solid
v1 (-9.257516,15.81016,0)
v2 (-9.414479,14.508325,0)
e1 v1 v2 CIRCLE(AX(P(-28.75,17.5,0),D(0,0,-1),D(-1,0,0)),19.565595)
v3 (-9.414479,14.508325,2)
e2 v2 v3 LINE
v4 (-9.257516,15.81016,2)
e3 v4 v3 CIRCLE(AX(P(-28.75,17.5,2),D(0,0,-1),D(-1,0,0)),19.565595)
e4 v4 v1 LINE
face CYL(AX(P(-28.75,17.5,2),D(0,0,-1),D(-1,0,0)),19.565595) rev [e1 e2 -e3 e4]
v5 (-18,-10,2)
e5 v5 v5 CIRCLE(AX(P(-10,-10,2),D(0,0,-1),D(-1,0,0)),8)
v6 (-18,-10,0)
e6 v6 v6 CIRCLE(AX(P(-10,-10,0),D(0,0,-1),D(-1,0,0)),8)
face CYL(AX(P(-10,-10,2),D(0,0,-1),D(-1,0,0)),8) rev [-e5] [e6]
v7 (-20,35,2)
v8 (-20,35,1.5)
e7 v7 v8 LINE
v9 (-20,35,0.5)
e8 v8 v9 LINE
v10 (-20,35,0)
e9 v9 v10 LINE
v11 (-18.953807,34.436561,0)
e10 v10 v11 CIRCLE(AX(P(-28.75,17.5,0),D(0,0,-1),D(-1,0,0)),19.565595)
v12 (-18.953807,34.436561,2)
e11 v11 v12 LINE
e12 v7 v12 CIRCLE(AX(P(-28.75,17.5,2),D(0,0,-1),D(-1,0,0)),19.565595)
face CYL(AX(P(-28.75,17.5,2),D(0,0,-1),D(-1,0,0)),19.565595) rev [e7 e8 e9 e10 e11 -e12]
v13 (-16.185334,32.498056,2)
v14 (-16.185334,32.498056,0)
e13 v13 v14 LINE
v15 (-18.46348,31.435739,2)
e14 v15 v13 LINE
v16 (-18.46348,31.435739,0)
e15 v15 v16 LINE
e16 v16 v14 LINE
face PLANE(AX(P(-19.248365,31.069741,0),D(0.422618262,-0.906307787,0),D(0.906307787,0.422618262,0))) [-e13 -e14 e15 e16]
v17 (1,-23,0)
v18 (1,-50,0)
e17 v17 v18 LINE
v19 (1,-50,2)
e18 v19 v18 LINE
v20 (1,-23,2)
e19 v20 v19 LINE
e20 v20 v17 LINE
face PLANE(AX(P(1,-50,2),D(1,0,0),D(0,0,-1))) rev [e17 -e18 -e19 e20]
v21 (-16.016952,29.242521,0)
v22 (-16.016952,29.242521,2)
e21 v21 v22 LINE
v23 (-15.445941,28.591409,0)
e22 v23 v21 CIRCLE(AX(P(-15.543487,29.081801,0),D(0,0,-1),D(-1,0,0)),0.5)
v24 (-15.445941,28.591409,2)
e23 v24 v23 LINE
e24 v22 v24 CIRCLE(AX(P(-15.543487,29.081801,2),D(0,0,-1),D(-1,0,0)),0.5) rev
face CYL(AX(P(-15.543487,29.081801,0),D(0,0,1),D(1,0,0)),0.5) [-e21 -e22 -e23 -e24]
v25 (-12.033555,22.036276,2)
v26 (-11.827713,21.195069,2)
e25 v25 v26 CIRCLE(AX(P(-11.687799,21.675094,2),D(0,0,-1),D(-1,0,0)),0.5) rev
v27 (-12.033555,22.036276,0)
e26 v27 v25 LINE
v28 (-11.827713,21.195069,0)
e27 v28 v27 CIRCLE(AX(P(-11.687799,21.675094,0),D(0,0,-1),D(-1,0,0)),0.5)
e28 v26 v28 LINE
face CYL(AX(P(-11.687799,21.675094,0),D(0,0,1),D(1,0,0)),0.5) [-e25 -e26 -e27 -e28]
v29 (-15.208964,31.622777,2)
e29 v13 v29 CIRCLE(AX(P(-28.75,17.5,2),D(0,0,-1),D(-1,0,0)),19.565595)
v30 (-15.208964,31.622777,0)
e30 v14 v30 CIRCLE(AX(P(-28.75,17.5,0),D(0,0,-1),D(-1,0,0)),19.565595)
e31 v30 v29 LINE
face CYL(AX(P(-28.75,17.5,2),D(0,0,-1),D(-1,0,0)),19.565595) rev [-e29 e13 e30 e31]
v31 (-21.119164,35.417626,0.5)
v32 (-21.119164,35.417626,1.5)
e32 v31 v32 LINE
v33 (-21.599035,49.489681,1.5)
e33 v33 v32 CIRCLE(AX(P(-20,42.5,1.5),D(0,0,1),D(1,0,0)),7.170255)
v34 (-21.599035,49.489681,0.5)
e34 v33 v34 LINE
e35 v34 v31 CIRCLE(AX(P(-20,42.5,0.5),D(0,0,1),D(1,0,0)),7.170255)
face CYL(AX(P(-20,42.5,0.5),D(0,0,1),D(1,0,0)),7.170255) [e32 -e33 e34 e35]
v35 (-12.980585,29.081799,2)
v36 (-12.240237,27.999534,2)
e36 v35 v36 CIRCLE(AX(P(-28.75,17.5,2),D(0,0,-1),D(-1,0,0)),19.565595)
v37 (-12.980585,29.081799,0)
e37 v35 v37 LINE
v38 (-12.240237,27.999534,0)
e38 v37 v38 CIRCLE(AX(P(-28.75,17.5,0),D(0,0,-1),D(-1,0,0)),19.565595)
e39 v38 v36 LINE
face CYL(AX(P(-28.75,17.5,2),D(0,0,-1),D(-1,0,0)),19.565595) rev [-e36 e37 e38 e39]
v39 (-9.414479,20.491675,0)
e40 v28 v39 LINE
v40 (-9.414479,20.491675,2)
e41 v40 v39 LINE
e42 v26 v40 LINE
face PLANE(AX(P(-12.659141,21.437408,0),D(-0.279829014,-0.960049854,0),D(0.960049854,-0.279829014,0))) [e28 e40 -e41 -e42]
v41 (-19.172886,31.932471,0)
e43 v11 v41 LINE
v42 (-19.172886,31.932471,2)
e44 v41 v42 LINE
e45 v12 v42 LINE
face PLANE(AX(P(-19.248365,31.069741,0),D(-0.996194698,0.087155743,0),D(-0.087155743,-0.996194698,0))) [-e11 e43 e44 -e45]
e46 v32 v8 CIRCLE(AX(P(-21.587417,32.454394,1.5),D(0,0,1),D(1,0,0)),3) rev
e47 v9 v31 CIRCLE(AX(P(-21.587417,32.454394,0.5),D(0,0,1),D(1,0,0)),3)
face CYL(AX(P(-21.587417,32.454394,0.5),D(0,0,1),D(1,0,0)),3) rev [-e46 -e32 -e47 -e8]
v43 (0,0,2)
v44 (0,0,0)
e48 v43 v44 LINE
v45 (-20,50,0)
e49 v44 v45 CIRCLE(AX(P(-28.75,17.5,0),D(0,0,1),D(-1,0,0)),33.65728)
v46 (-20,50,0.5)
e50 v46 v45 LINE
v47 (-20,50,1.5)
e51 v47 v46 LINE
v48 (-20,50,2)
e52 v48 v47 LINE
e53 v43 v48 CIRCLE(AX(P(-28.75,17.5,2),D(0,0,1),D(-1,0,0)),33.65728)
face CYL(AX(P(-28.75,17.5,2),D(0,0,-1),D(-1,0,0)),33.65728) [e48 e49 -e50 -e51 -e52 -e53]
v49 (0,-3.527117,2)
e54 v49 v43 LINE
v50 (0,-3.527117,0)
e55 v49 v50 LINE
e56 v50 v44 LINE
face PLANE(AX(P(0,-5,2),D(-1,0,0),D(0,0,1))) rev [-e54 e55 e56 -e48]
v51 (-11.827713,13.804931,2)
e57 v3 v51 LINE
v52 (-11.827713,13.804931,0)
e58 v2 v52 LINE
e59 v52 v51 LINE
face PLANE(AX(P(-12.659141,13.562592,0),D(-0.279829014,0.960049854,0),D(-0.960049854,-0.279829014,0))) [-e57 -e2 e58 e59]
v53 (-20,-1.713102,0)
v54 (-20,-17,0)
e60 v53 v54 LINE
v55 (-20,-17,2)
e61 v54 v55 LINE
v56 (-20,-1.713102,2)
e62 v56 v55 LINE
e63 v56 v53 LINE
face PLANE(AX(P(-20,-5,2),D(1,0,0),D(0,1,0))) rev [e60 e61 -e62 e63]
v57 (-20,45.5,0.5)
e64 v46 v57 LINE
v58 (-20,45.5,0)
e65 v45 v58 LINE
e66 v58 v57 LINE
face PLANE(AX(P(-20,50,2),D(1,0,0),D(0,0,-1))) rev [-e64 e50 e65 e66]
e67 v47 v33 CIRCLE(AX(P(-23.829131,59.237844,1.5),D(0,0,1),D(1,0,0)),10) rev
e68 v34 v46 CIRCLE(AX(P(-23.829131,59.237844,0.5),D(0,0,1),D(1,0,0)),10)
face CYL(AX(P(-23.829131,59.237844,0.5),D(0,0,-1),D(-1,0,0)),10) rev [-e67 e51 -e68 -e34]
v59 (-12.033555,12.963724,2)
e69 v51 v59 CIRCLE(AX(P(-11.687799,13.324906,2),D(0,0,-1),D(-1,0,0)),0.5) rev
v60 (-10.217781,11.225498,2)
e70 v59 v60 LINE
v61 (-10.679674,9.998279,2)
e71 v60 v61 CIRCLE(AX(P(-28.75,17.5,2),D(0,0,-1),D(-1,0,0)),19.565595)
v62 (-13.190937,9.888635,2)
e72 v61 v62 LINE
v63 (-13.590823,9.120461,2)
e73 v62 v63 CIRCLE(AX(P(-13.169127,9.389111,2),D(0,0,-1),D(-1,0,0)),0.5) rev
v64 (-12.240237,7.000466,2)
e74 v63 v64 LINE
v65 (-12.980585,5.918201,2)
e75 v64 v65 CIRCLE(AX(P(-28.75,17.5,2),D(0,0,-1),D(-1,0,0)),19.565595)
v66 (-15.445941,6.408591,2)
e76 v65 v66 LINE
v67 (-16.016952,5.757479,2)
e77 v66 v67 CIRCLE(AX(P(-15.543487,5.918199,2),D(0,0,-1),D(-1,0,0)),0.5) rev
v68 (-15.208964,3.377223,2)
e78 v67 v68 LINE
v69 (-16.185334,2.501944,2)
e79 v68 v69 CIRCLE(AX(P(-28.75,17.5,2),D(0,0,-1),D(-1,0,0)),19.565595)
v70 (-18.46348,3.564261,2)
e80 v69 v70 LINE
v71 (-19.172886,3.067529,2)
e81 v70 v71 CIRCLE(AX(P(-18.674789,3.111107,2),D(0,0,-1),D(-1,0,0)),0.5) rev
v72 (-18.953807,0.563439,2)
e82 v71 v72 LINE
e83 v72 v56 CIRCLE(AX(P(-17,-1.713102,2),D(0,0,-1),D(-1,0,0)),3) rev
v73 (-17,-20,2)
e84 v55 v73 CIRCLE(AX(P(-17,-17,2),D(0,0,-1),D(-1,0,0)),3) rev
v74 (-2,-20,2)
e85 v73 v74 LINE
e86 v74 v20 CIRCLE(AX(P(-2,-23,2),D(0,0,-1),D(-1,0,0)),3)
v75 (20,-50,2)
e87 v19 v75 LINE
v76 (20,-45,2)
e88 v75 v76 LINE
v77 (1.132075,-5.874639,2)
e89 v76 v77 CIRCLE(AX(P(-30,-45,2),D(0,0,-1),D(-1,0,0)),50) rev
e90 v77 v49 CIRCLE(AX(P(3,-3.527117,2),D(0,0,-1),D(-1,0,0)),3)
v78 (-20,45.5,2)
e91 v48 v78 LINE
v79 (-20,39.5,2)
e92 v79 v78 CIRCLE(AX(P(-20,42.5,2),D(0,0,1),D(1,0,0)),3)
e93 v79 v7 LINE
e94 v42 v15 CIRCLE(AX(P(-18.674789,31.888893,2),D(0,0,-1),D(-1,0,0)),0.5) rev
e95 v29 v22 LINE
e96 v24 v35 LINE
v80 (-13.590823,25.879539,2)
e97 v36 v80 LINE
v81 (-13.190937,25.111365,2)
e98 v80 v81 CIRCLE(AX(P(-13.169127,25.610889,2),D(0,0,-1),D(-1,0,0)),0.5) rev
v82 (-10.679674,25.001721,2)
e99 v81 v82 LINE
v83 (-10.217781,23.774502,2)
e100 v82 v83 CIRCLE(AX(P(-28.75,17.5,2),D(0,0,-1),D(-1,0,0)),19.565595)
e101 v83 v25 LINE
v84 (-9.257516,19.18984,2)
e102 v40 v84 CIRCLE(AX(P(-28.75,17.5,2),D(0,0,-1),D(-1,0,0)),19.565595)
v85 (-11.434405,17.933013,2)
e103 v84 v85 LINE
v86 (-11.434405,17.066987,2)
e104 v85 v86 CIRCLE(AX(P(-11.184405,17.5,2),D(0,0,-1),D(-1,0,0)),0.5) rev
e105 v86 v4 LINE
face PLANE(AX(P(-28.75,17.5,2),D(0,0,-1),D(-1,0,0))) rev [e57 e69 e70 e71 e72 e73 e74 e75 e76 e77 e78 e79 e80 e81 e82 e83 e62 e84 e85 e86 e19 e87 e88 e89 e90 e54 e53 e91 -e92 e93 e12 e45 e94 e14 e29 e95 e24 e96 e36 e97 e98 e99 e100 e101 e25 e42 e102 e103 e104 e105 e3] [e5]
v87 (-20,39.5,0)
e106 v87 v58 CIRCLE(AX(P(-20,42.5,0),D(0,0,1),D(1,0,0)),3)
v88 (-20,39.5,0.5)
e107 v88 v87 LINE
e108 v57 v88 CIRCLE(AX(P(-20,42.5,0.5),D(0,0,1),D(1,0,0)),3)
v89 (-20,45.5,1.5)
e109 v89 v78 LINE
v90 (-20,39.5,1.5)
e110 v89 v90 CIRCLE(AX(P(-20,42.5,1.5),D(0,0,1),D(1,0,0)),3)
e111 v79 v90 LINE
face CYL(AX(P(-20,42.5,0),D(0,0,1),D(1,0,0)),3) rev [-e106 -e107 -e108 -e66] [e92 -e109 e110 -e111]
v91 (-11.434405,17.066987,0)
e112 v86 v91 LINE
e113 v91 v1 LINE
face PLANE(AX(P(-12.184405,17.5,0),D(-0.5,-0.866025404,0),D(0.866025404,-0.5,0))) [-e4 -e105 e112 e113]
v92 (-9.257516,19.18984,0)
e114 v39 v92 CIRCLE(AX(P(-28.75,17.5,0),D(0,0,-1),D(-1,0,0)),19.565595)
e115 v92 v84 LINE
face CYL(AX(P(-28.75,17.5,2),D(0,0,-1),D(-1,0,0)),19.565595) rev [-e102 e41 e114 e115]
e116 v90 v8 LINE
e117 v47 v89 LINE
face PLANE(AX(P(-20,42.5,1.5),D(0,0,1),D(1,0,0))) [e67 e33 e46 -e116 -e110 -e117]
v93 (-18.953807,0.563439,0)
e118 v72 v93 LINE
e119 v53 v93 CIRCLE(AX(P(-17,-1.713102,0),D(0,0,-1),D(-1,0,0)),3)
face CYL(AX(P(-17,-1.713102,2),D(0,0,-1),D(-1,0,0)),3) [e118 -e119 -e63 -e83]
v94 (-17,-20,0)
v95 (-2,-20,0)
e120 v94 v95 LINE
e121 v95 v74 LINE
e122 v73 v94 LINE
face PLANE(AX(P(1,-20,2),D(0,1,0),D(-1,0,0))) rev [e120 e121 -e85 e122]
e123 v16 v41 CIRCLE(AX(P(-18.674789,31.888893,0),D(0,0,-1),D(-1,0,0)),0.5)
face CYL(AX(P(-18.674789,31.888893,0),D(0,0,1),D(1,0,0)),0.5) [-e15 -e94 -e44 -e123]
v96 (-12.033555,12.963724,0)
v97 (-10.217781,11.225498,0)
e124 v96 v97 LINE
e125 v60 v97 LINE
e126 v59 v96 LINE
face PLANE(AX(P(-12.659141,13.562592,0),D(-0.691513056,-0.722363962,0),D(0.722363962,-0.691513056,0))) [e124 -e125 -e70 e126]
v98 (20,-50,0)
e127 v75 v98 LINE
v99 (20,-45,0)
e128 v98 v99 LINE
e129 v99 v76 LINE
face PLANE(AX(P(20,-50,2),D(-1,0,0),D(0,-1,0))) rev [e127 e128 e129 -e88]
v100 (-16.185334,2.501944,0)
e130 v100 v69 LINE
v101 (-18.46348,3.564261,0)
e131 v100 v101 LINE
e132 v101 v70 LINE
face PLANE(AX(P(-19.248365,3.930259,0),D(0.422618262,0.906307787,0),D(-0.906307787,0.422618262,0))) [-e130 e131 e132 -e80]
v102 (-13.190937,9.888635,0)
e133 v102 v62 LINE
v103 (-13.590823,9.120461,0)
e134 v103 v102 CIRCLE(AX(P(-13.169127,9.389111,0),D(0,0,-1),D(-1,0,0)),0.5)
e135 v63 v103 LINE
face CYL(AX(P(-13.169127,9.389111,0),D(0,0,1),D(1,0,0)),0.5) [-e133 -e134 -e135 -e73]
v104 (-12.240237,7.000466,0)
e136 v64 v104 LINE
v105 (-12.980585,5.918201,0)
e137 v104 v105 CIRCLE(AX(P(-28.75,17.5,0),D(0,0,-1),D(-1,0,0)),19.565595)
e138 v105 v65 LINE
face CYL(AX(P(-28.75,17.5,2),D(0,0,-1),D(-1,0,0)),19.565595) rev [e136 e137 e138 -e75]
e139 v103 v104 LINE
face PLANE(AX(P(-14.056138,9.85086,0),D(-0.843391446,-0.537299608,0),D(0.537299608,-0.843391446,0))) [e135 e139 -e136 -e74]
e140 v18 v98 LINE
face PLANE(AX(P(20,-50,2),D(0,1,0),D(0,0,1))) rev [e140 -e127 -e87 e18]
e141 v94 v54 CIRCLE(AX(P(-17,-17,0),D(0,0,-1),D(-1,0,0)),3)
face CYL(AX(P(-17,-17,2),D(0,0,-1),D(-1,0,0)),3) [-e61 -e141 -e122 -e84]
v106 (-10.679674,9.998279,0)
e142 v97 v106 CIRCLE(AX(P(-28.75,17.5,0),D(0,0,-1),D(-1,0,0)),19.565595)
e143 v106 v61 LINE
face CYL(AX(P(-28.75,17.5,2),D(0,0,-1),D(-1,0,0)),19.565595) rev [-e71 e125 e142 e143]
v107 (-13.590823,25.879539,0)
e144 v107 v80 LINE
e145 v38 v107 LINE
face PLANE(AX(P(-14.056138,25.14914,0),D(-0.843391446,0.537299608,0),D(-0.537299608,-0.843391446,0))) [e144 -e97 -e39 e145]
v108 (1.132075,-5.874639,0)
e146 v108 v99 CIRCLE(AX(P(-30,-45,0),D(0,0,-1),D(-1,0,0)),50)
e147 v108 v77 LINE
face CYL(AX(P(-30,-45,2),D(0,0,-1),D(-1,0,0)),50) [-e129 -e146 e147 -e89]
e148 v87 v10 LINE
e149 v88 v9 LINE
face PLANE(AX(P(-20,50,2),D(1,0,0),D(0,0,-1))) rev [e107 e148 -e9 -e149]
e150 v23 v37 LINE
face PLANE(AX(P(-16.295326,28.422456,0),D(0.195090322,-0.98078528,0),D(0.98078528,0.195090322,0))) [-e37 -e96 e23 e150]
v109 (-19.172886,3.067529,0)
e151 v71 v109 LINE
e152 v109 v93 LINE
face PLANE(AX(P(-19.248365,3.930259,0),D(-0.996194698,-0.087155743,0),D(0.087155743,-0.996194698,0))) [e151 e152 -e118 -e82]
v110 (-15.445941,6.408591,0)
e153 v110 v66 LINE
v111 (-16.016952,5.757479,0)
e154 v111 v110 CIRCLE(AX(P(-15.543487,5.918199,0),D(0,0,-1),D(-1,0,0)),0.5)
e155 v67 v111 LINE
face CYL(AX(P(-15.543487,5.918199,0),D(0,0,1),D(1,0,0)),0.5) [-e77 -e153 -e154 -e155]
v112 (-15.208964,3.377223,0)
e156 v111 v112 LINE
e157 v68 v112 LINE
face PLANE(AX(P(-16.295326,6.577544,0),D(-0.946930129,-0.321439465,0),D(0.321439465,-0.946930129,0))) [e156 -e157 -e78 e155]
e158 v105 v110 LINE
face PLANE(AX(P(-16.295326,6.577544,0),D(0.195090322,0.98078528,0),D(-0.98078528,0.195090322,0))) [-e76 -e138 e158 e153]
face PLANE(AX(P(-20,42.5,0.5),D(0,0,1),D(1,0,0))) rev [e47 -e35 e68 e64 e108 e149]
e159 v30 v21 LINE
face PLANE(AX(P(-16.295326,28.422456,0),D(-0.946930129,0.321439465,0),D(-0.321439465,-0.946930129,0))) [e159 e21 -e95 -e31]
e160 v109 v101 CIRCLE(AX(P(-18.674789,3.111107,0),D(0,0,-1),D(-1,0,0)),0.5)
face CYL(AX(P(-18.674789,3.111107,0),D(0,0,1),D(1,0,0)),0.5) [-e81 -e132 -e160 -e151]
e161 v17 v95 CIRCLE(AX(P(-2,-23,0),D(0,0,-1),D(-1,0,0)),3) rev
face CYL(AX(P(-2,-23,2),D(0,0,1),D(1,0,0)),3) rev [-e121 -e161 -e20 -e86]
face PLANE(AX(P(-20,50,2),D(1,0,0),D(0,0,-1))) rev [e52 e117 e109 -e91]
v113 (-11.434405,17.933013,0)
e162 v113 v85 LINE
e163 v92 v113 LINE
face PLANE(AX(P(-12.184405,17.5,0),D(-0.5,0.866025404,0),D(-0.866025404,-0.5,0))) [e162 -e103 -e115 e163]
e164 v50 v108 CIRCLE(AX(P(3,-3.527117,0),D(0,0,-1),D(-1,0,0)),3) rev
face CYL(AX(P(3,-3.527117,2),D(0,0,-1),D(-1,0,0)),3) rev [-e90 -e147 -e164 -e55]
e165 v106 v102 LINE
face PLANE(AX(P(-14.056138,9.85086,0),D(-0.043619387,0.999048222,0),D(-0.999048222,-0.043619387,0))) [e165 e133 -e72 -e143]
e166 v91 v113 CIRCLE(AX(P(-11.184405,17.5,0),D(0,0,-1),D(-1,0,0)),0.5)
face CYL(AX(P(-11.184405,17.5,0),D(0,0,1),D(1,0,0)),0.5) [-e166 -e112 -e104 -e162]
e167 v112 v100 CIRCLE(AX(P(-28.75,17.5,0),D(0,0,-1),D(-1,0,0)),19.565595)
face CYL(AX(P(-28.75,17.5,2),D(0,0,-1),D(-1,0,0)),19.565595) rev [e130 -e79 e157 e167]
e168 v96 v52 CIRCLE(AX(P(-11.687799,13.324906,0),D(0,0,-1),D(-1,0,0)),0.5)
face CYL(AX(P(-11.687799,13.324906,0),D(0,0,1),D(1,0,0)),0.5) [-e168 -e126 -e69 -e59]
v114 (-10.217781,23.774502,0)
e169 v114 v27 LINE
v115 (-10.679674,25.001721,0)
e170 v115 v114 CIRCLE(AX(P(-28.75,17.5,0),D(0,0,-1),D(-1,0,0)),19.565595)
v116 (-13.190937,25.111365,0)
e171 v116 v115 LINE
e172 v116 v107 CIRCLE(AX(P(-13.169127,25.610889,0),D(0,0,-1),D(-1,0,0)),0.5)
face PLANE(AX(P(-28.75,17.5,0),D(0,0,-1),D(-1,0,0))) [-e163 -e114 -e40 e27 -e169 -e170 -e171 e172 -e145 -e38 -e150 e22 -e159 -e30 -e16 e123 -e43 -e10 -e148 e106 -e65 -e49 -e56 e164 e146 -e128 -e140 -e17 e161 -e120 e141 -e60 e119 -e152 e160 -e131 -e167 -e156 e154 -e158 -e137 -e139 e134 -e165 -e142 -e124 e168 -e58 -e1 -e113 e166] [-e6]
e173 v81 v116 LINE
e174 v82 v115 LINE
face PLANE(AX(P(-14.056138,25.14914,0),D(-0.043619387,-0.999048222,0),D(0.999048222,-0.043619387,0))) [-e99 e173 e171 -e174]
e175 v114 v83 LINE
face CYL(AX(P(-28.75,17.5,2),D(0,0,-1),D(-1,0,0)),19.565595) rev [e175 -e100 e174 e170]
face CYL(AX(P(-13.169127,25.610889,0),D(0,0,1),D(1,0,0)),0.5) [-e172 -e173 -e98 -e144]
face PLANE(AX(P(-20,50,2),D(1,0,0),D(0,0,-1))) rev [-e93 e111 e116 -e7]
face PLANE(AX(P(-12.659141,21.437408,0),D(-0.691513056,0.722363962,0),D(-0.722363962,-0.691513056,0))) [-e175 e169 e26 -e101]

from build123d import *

# Parameters (mm, degrees)
BOSS_EXTRUDE1_DEPTH       = 2
BOSS_EXTRUDE2_DEPTH       = 2
CIRPATTERN1_COUNT         = 5
CIRPATTERN1_ANGLE         = 55
CIRPATTERN2_COPY_1_DEPTH  = 2
CIRPATTERN2_COPY_2_DEPTH  = 2
CIRPATTERN2_COPY_3_DEPTH  = 2
CIRPATTERN2_COPY_4_DEPTH  = 2
CIRPATTERN2_COPY_5_DEPTH  = 2
CIRPATTERN2_COPY_6_DEPTH  = 2
CIRPATTERN2_COPY_7_DEPTH  = 2
CIRPATTERN2_COPY_8_DEPTH  = 2
CIRPATTERN2_COPY_9_DEPTH  = 2
CIRPATTERN2_COPY_10_DEPTH = 2
CIRPATTERN2_COPY_11_DEPTH = 2
CIRPATTERN2_COPY_12_DEPTH = 2
CIRPATTERN2_COPY_13_DEPTH = 2
CIRPATTERN2_COPY_14_DEPTH = 2
CIRPATTERN2_COPY_15_DEPTH = 2
CIRPATTERN2_COPY_16_DEPTH = 2
CIRPATTERN2_COPY_17_DEPTH = 2
CIRPATTERN2_COPY_18_DEPTH = 2
CIRPATTERN2_COPY_19_DEPTH = 2
CIRPATTERN2_COPY_20_DEPTH = 2
SKETCH3_R                 = 8
CUT_EXTRUDE1_DEPTH        = 54.888774341
BOSS_EXTRUDE3_DEPTH       = 0.5
BOSS_EXTRUDE3_DEPTH_BACK  = 0.5
SKETCH4_R                 = 7.170254919
CUT_EXTRUDE2_DEPTH        = 57.914170049
CUT_EXTRUDE2_DEPTH_BACK   = 57.914170049
SKETCH5_R                 = 3
FILLET1_R                 = 50
FILLET2_R                 = 10
FILLET3_R                 = 3
FILLET4_R                 = 0.5


with BuildPart() as part:
    # Sketch1 → Boss-Extrude1 (new body)
    with BuildSketch(Plane.XY):
        with BuildLine():
            Line((-20, -5), (-20, -20))
            Line((-20, -20), (0, -20))
            Line((0, -20), (1, -20))
            Line((1, -20), (1, -50))
            Line((1, -50), (20, -50))
            Line((20, -50), (20, -5))
            Line((20, -5), (0, -5))
            Line((0, -5), (0, 0))
            ThreePointArc((0, 0), (2.5, 30), (-20, 50))
            Line((-20, 50), (-20, 35))
            ThreePointArc((-20, 35), (-9.184405197, 17.5), (-20, 0))
            Line((-20, 0), (-20, -5))
        make_face()
    extrude(amount=BOSS_EXTRUDE1_DEPTH)

    # Sketch2 → Boss-Extrude2 (add)
    with BuildSketch(Plane.XY.offset(2)):
        Polygon((-12.184405197, 17.5), (-8.511312338, 19.620661151), (-8.511312338, 15.379338849), align=None)
    boss_extrude2 = extrude(amount=-BOSS_EXTRUDE2_DEPTH)

    # CirPattern1: Boss-Extrude2 ×5 about axis
    cirpattern1_axis = Axis((-28.75, 17.5, 0), (0, 0, -1))
    for i in range(1, CIRPATTERN1_COUNT):
        add(boss_extrude2.rotate(cirpattern1_axis, i * CIRPATTERN1_ANGLE / (CIRPATTERN1_COUNT - 1)))

    # CirPattern2 copy 1 sketch → CirPattern2 copy 1 (add)
    with BuildSketch(Plane.XY.offset(2)):
        Polygon((-12.184405197, 17.5), (-8.511312338, 19.620661151), (-8.511312338, 15.379338849), align=None)
    extrude(amount=-CIRPATTERN2_COPY_1_DEPTH)

    # CirPattern2 copy 2 sketch → CirPattern2 copy 2 (add)
    with BuildSketch(Plane(origin=(3.335587623, 7.334983183, 2), x_dir=(0.9713420698132613, 0.23768589232617357, 0), z_dir=(0, 0, 1))):
        Polygon((-12.184405197, 17.5), (-8.511312338, 19.620661151), (-8.511312338, 15.379338849), align=None)
    extrude(amount=-CIRPATTERN2_COPY_2_DEPTH)

    # CirPattern2 copy 3 sketch → CirPattern2 copy 3 (add)
    with BuildSketch(Plane(origin=(4.832162185, 15.25258305, 2), x_dir=(0.8870108331782213, 0.46174861323503485, 0), z_dir=(0, 0, 1))):
        Polygon((-12.184405197, 17.5), (-8.511312338, 19.620661151), (-8.511312338, 15.379338849), align=None)
    extrude(amount=-CIRPATTERN2_COPY_3_DEPTH)

    # CirPattern2 copy 4 sketch → CirPattern2 copy 4 (add)
    with BuildSketch(Plane(origin=(4.403946229, 23.298995553, 2), x_dir=(0.7518398074789764, 0.6593458151000701, 0), z_dir=(0, 0, 1))):
        Polygon((-12.184405197, 17.5), (-8.511312338, 19.620661151), (-8.511312338, 15.379338849), align=None)
    extrude(amount=-CIRPATTERN2_COPY_4_DEPTH)

    # CirPattern2 copy 5 sketch → CirPattern2 copy 5 (add)
    with BuildSketch(Plane(origin=(-4.983418609, -6.331955626, 2), x_dir=(0.9713420698132613, -0.23768589232617357, 0), z_dir=(0, 0, 1))):
        Polygon((-12.184405197, 17.5), (-8.511312338, 19.620661151), (-8.511312338, 15.379338849), align=None)
    extrude(amount=-CIRPATTERN2_COPY_5_DEPTH)

    # CirPattern2 copy 6 sketch → CirPattern2 copy 6 (add)
    with BuildSketch(Plane.XY.offset(2)):
        Polygon((-12.184405197, 17.5), (-8.511312338, 19.620661151), (-8.511312338, 15.379338849), align=None)
    extrude(amount=-CIRPATTERN2_COPY_6_DEPTH)

    # CirPattern2 copy 7 sketch → CirPattern2 copy 7 (add)
    with BuildSketch(Plane(origin=(3.335587623, 7.334983183, 2), x_dir=(0.9713420698132613, 0.2376858923261736, 0), z_dir=(0, 0, 1))):
        Polygon((-12.184405197, 17.5), (-8.511312338, 19.620661151), (-8.511312338, 15.379338849), align=None)
    extrude(amount=-CIRPATTERN2_COPY_7_DEPTH)

    # CirPattern2 copy 8 sketch → CirPattern2 copy 8 (add)
    with BuildSketch(Plane(origin=(4.832162185, 15.25258305, 2), x_dir=(0.8870108331782214, 0.4617486132350349, 0), z_dir=(0, 0, 1))):
        Polygon((-12.184405197, 17.5), (-8.511312338, 19.620661151), (-8.511312338, 15.379338849), align=None)
    extrude(amount=-CIRPATTERN2_COPY_8_DEPTH)

    # CirPattern2 copy 9 sketch → CirPattern2 copy 9 (add)
    with BuildSketch(Plane(origin=(-11.329039278, -11.297962211, 2), x_dir=(0.8870108331782213, -0.46174861323503485, 0), z_dir=(0, 0, 1))):
        Polygon((-12.184405197, 17.5), (-8.511312338, 19.620661151), (-8.511312338, 15.379338849), align=None)
    extrude(amount=-CIRPATTERN2_COPY_9_DEPTH)

    # CirPattern2 copy 10 sketch → CirPattern2 copy 10 (add)
    with BuildSketch(Plane(origin=(-4.983418609, -6.331955626, 2), x_dir=(0.9713420698132613, -0.2376858923261736, 0), z_dir=(0, 0, 1))):
        Polygon((-12.184405197, 17.5), (-8.511312338, 19.620661151), (-8.511312338, 15.379338849), align=None)
    extrude(amount=-CIRPATTERN2_COPY_10_DEPTH)

    # CirPattern2 copy 11 sketch → CirPattern2 copy 11 (add)
    with BuildSketch(Plane.XY.offset(2)):
        Polygon((-12.184405197, 17.5), (-8.511312338, 19.620661151), (-8.511312338, 15.379338849), align=None)
    extrude(amount=-CIRPATTERN2_COPY_11_DEPTH)

    # CirPattern2 copy 12 sketch → CirPattern2 copy 12 (add)
    with BuildSketch(Plane(origin=(3.335587623, 7.334983183, 2), x_dir=(0.9713420698132613, 0.2376858923261736, 0), z_dir=(0, 0, 1))):
        Polygon((-12.184405197, 17.5), (-8.511312338, 19.620661151), (-8.511312338, 15.379338849), align=None)
    extrude(amount=-CIRPATTERN2_COPY_12_DEPTH)

    # CirPattern2 copy 13 sketch → CirPattern2 copy 13 (add)
    with BuildSketch(Plane(origin=(-18.673157299, -14.613388815, 2), x_dir=(0.7518398074789764, -0.6593458151000701, 0), z_dir=(0, 0, 1))):
        Polygon((-12.184405197, 17.5), (-8.511312338, 19.620661151), (-8.511312338, 15.379338849), align=None)
    extrude(amount=-CIRPATTERN2_COPY_13_DEPTH)

    # CirPattern2 copy 14 sketch → CirPattern2 copy 14 (add)
    with BuildSketch(Plane(origin=(-11.329039278, -11.297962211, 2), x_dir=(0.8870108331782214, -0.4617486132350349, 0), z_dir=(0, 0, 1))):
        Polygon((-12.184405197, 17.5), (-8.511312338, 19.620661151), (-8.511312338, 15.379338849), align=None)
    extrude(amount=-CIRPATTERN2_COPY_14_DEPTH)

    # CirPattern2 copy 15 sketch → CirPattern2 copy 15 (add)
    with BuildSketch(Plane(origin=(-4.983418609, -6.331955626, 2), x_dir=(0.9713420698132613, -0.2376858923261736, 0), z_dir=(0, 0, 1))):
        Polygon((-12.184405197, 17.5), (-8.511312338, 19.620661151), (-8.511312338, 15.379338849), align=None)
    extrude(amount=-CIRPATTERN2_COPY_15_DEPTH)

    # CirPattern2 copy 16 sketch → CirPattern2 copy 16 (add)
    with BuildSketch(Plane.XY.offset(2)):
        Polygon((-12.184405197, 17.5), (-8.511312338, 19.620661151), (-8.511312338, 15.379338849), align=None)
    extrude(amount=-CIRPATTERN2_COPY_16_DEPTH)

    # CirPattern2 copy 17 sketch → CirPattern2 copy 17 (add)
    with BuildSketch(Plane(origin=(3.335587623, 7.334983183, 2), x_dir=(0.9713420698132613, 0.2376858923261736, 0), z_dir=(0, 0, 1))):
        Polygon((-12.184405197, 17.5), (-8.511312338, 19.620661151), (-8.511312338, 15.379338849), align=None)
    extrude(amount=-CIRPATTERN2_COPY_17_DEPTH)

    # CirPattern2 copy 18 sketch → CirPattern2 copy 18 (add)
    with BuildSketch(Plane(origin=(4.832162185, 15.25258305, 2), x_dir=(0.8870108331782213, 0.46174861323503485, 0), z_dir=(0, 0, 1))):
        Polygon((-12.184405197, 17.5), (-8.511312338, 19.620661151), (-8.511312338, 15.379338849), align=None)
    extrude(amount=-CIRPATTERN2_COPY_18_DEPTH)

    # CirPattern2 copy 19 sketch → CirPattern2 copy 19 (add)
    with BuildSketch(Plane(origin=(4.403946229, 23.298995553, 2), x_dir=(0.7518398074789764, 0.6593458151000701, 0), z_dir=(0, 0, 1))):
        Polygon((-12.184405197, 17.5), (-8.511312338, 19.620661151), (-8.511312338, 15.379338849), align=None)
    extrude(amount=-CIRPATTERN2_COPY_19_DEPTH)

    # CirPattern2 copy 20 sketch → CirPattern2 copy 20 (add)
    with BuildSketch(Plane(origin=(2.07548332, 31.013033637, 2), x_dir=(0.5735764363510444, 0.819152044288993, 0), z_dir=(0, 0, 1))):
        Polygon((-12.184405197, 17.5), (-8.511312338, 19.620661151), (-8.511312338, 15.379338849), align=None)
    extrude(amount=-CIRPATTERN2_COPY_20_DEPTH)

    # Sketch3 → Cut-Extrude1 (cut, through all)
    with BuildSketch(Plane(origin=(0, 0, 0), x_dir=(-1, 0, 0), z_dir=(0, 0, -1))):
        with Locations((10, -10)):
            Circle(SKETCH3_R)
    extrude(amount=-CUT_EXTRUDE1_DEPTH, mode=Mode.SUBTRACT)

    # Sketch4 → Boss-Extrude3 (add, two sides: drawn at the far end of the back side and taken through both)
    with BuildSketch(Plane.XY.offset(1).offset(-BOSS_EXTRUDE3_DEPTH_BACK)):
        with Locations((-20, 42.5)):
            Circle(SKETCH4_R)
    extrude(amount=BOSS_EXTRUDE3_DEPTH + BOSS_EXTRUDE3_DEPTH_BACK)

    # Sketch5 → Cut-Extrude2 (cut, two sides: drawn at the far end of the back side and taken through both)
    with BuildSketch(Plane.XY.offset(1).offset(-CUT_EXTRUDE2_DEPTH_BACK)):
        with Locations(Location((-20, 42.5, 0), (0, 0, 90))):
            Circle(SKETCH5_R)
    extrude(amount=CUT_EXTRUDE2_DEPTH + CUT_EXTRUDE2_DEPTH_BACK, mode=Mode.SUBTRACT)

    # Fillet1
    # the kernel refuses this fillet: 50 mm, written as the material it takes off along each edge
    with BuildSketch(Plane(origin=(20, -5, -100), x_dir=(-1, 0, 0), z_dir=(0, 0, 1))) as fillet1_piece_1:
        with BuildLine():
            CenterArc((50, 40), FILLET1_R, 180, 53.130102354)
            Line((0, 40), (-1, 40))
            Line((-1, 40), (-1, 0))
            Line((-1, 0), (0, -1))
            ThreePointArc((0, -1), (10, -1), (19.4, -0.8))
            Line((19.4, -0.8), (20, 0))
        make_face()
    extrude(amount=202, mode=Mode.SUBTRACT)

    # Fillet2
    # the kernel refuses this fillet: 10 mm, written as the material it adds along each edge
    with BuildSketch(Plane(origin=(-20, 49.670254919, 0.5), x_dir=(0, 1, 0), z_dir=(0, 0, 1))) as fillet2_piece_1:
        with BuildLine():
            CenterArc((9.56758868, 3.829131186), FILLET2_R, 192.885861341, 9.62838373)
            Line((-0.180573871, 1.599035475), (-0.375537122, 1.55443356))
            ThreePointArc((-0.375537122, 1.55443356), (-0.244023303, 0.78215679), (-0.2, 0))
            Line((-0.2, 0), (0, -0.2))
            ThreePointArc((0, -0.2), (0.16487254, -0.2), (0.144988209, -0.076582624))
            Line((0.144988209, -0.076582624), (0.329745081, 0))
        make_face()
    extrude(amount=1)

    # Fillet3
    # the kernel refuses this fillet: 3 mm, written as the material it adds along each edge
    with BuildSketch(Plane(origin=(0, -5, 0), x_dir=(0.7913345913846653, -0.6113833204120512, 0), z_dir=(0, 0, 1))) as fillet3_piece_1:
        with BuildLine():
            CenterArc((1.473507854, 2.999692996), FILLET3_R, 217.689593385, 51.490710876)
            Line((-0.90049592, 1.165543035), (-0.947975995, 1.128860036))
            Line((-0.947975995, 1.128860036), (-0.047480075, -0.036682999))
            Line((-0.047480075, -0.036682999), (0.000858354, -0.05999386))
            ThreePointArc((0.000858354, -0.05999386), (0.715295075, -0.054883268), (1.429731796, -0.05999386))
            Line((1.429731796, -0.05999386), (1.43059015, 0))
        make_face()
    extrude(amount=2)
    with BuildSketch(Plane(origin=(1, -20, 0), x_dir=(-1, 0, 0), z_dir=(0, 0, 1))) as fillet3_piece_2:
        with BuildLine():
            CenterArc((FILLET3_R, FILLET3_R), FILLET3_R, 180, 90)
            Line((0, FILLET3_R), (-FILLET3_R * 0.02, FILLET3_R))
            Line((-FILLET3_R * 0.02, FILLET3_R), (-FILLET3_R * 0.02, -FILLET3_R * 0.02))
            Line((-FILLET3_R * 0.02, -FILLET3_R * 0.02), (FILLET3_R, -FILLET3_R * 0.02))
            Line((FILLET3_R, -FILLET3_R * 0.02), (FILLET3_R, 0))
        make_face()
    extrude(amount=2)
    with BuildSketch(Plane(origin=(-20, 35.329745081, 1.5), x_dir=(0, -1, 0), z_dir=(0, 0, -1))) as fillet3_piece_3:
        with BuildLine():
            CenterArc((2.875350756, 1.587416691), FILLET3_R, 188.979685055, 22.967606948)
            Line((-0.087880477, 1.119163917), (-0.147145102, 1.109798862))
            ThreePointArc((-0.147145102, 1.109798862), (-0.081819755, 0.556607533), (-0.06, 0))
            Line((-0.06, 0), (0, -0.06))
            ThreePointArc((0, -0.06), (0.16487254, -0.06), (0.278832967, -0.031748334))
            Line((0.278832967, -0.031748334), (0.329745081, 0))
        make_face()
    extrude(amount=1)
    # the kernel refuses this fillet: 3 mm, written as the material it takes off along each edge
    with BuildSketch(Plane(origin=(-20, -20, -7.5), x_dir=(1, 0, 0), z_dir=(0, 0, 1))) as fillet3_2_piece_1:
        with BuildLine():
            CenterArc((FILLET3_R, FILLET3_R), FILLET3_R, 180, 90)
            Line((0, FILLET3_R), (-FILLET3_R * 0.02, FILLET3_R))
            Line((-FILLET3_R * 0.02, FILLET3_R), (-FILLET3_R * 0.02, -FILLET3_R * 0.02))
            Line((-FILLET3_R * 0.02, -FILLET3_R * 0.02), (FILLET3_R, -FILLET3_R * 0.02))
            Line((FILLET3_R, -FILLET3_R * 0.02), (FILLET3_R, 0))
        make_face()
    extrude(amount=17, mode=Mode.SUBTRACT)
    with BuildSketch(Plane(origin=(-20, 0, -4.282755208), x_dir=(0.8804344923841002, 0.47416780217592974, 0), z_dir=(0, 0, 1))) as fillet3_2_piece_2:
        with BuildLine():
            CenterArc((1.829005627, -2.93077757), FILLET3_R, 102.332157439, 49.362663028)
            Line((-0.81229785, -1.508274163), (-0.865123919, -1.479824095))
            Line((-0.865123919, -1.479824095), (-0.05282607, 0.028450068))
            Line((-0.05282607, 0.028450068), (0.001821978, 0.05997233))
            ThreePointArc((0.001821978, 0.05997233), (0.59413473, 0.050977083), (1.175454736, 0.058615551))
            Line((1.175454736, 0.058615551), (1.188269459, 0))
        make_face()
    extrude(amount=10.565510417, mode=Mode.SUBTRACT)

    # Fillet4
    fillet4_edges = [part.edges().sort_by_distance(p)[0] for p in [
        (-19.248365167, 3.930259152, 1),
        (-12.659140856, 21.437408183, 1),
        (-14.056137952, 25.149140428, 1),
        (-16.295326392, 28.422455608, 1),
        (-19.248365167, 31.069740848, 1),
        (-12.184405197, 17.5, 1),
        (-12.659140856, 13.562591817, 1),
        (-14.056137952, 9.850859572, 1),
        (-16.295326392, 6.577544392, 1),
    ]]
    fillet(fillet4_edges, radius=FILLET4_R)


solid = part.part
